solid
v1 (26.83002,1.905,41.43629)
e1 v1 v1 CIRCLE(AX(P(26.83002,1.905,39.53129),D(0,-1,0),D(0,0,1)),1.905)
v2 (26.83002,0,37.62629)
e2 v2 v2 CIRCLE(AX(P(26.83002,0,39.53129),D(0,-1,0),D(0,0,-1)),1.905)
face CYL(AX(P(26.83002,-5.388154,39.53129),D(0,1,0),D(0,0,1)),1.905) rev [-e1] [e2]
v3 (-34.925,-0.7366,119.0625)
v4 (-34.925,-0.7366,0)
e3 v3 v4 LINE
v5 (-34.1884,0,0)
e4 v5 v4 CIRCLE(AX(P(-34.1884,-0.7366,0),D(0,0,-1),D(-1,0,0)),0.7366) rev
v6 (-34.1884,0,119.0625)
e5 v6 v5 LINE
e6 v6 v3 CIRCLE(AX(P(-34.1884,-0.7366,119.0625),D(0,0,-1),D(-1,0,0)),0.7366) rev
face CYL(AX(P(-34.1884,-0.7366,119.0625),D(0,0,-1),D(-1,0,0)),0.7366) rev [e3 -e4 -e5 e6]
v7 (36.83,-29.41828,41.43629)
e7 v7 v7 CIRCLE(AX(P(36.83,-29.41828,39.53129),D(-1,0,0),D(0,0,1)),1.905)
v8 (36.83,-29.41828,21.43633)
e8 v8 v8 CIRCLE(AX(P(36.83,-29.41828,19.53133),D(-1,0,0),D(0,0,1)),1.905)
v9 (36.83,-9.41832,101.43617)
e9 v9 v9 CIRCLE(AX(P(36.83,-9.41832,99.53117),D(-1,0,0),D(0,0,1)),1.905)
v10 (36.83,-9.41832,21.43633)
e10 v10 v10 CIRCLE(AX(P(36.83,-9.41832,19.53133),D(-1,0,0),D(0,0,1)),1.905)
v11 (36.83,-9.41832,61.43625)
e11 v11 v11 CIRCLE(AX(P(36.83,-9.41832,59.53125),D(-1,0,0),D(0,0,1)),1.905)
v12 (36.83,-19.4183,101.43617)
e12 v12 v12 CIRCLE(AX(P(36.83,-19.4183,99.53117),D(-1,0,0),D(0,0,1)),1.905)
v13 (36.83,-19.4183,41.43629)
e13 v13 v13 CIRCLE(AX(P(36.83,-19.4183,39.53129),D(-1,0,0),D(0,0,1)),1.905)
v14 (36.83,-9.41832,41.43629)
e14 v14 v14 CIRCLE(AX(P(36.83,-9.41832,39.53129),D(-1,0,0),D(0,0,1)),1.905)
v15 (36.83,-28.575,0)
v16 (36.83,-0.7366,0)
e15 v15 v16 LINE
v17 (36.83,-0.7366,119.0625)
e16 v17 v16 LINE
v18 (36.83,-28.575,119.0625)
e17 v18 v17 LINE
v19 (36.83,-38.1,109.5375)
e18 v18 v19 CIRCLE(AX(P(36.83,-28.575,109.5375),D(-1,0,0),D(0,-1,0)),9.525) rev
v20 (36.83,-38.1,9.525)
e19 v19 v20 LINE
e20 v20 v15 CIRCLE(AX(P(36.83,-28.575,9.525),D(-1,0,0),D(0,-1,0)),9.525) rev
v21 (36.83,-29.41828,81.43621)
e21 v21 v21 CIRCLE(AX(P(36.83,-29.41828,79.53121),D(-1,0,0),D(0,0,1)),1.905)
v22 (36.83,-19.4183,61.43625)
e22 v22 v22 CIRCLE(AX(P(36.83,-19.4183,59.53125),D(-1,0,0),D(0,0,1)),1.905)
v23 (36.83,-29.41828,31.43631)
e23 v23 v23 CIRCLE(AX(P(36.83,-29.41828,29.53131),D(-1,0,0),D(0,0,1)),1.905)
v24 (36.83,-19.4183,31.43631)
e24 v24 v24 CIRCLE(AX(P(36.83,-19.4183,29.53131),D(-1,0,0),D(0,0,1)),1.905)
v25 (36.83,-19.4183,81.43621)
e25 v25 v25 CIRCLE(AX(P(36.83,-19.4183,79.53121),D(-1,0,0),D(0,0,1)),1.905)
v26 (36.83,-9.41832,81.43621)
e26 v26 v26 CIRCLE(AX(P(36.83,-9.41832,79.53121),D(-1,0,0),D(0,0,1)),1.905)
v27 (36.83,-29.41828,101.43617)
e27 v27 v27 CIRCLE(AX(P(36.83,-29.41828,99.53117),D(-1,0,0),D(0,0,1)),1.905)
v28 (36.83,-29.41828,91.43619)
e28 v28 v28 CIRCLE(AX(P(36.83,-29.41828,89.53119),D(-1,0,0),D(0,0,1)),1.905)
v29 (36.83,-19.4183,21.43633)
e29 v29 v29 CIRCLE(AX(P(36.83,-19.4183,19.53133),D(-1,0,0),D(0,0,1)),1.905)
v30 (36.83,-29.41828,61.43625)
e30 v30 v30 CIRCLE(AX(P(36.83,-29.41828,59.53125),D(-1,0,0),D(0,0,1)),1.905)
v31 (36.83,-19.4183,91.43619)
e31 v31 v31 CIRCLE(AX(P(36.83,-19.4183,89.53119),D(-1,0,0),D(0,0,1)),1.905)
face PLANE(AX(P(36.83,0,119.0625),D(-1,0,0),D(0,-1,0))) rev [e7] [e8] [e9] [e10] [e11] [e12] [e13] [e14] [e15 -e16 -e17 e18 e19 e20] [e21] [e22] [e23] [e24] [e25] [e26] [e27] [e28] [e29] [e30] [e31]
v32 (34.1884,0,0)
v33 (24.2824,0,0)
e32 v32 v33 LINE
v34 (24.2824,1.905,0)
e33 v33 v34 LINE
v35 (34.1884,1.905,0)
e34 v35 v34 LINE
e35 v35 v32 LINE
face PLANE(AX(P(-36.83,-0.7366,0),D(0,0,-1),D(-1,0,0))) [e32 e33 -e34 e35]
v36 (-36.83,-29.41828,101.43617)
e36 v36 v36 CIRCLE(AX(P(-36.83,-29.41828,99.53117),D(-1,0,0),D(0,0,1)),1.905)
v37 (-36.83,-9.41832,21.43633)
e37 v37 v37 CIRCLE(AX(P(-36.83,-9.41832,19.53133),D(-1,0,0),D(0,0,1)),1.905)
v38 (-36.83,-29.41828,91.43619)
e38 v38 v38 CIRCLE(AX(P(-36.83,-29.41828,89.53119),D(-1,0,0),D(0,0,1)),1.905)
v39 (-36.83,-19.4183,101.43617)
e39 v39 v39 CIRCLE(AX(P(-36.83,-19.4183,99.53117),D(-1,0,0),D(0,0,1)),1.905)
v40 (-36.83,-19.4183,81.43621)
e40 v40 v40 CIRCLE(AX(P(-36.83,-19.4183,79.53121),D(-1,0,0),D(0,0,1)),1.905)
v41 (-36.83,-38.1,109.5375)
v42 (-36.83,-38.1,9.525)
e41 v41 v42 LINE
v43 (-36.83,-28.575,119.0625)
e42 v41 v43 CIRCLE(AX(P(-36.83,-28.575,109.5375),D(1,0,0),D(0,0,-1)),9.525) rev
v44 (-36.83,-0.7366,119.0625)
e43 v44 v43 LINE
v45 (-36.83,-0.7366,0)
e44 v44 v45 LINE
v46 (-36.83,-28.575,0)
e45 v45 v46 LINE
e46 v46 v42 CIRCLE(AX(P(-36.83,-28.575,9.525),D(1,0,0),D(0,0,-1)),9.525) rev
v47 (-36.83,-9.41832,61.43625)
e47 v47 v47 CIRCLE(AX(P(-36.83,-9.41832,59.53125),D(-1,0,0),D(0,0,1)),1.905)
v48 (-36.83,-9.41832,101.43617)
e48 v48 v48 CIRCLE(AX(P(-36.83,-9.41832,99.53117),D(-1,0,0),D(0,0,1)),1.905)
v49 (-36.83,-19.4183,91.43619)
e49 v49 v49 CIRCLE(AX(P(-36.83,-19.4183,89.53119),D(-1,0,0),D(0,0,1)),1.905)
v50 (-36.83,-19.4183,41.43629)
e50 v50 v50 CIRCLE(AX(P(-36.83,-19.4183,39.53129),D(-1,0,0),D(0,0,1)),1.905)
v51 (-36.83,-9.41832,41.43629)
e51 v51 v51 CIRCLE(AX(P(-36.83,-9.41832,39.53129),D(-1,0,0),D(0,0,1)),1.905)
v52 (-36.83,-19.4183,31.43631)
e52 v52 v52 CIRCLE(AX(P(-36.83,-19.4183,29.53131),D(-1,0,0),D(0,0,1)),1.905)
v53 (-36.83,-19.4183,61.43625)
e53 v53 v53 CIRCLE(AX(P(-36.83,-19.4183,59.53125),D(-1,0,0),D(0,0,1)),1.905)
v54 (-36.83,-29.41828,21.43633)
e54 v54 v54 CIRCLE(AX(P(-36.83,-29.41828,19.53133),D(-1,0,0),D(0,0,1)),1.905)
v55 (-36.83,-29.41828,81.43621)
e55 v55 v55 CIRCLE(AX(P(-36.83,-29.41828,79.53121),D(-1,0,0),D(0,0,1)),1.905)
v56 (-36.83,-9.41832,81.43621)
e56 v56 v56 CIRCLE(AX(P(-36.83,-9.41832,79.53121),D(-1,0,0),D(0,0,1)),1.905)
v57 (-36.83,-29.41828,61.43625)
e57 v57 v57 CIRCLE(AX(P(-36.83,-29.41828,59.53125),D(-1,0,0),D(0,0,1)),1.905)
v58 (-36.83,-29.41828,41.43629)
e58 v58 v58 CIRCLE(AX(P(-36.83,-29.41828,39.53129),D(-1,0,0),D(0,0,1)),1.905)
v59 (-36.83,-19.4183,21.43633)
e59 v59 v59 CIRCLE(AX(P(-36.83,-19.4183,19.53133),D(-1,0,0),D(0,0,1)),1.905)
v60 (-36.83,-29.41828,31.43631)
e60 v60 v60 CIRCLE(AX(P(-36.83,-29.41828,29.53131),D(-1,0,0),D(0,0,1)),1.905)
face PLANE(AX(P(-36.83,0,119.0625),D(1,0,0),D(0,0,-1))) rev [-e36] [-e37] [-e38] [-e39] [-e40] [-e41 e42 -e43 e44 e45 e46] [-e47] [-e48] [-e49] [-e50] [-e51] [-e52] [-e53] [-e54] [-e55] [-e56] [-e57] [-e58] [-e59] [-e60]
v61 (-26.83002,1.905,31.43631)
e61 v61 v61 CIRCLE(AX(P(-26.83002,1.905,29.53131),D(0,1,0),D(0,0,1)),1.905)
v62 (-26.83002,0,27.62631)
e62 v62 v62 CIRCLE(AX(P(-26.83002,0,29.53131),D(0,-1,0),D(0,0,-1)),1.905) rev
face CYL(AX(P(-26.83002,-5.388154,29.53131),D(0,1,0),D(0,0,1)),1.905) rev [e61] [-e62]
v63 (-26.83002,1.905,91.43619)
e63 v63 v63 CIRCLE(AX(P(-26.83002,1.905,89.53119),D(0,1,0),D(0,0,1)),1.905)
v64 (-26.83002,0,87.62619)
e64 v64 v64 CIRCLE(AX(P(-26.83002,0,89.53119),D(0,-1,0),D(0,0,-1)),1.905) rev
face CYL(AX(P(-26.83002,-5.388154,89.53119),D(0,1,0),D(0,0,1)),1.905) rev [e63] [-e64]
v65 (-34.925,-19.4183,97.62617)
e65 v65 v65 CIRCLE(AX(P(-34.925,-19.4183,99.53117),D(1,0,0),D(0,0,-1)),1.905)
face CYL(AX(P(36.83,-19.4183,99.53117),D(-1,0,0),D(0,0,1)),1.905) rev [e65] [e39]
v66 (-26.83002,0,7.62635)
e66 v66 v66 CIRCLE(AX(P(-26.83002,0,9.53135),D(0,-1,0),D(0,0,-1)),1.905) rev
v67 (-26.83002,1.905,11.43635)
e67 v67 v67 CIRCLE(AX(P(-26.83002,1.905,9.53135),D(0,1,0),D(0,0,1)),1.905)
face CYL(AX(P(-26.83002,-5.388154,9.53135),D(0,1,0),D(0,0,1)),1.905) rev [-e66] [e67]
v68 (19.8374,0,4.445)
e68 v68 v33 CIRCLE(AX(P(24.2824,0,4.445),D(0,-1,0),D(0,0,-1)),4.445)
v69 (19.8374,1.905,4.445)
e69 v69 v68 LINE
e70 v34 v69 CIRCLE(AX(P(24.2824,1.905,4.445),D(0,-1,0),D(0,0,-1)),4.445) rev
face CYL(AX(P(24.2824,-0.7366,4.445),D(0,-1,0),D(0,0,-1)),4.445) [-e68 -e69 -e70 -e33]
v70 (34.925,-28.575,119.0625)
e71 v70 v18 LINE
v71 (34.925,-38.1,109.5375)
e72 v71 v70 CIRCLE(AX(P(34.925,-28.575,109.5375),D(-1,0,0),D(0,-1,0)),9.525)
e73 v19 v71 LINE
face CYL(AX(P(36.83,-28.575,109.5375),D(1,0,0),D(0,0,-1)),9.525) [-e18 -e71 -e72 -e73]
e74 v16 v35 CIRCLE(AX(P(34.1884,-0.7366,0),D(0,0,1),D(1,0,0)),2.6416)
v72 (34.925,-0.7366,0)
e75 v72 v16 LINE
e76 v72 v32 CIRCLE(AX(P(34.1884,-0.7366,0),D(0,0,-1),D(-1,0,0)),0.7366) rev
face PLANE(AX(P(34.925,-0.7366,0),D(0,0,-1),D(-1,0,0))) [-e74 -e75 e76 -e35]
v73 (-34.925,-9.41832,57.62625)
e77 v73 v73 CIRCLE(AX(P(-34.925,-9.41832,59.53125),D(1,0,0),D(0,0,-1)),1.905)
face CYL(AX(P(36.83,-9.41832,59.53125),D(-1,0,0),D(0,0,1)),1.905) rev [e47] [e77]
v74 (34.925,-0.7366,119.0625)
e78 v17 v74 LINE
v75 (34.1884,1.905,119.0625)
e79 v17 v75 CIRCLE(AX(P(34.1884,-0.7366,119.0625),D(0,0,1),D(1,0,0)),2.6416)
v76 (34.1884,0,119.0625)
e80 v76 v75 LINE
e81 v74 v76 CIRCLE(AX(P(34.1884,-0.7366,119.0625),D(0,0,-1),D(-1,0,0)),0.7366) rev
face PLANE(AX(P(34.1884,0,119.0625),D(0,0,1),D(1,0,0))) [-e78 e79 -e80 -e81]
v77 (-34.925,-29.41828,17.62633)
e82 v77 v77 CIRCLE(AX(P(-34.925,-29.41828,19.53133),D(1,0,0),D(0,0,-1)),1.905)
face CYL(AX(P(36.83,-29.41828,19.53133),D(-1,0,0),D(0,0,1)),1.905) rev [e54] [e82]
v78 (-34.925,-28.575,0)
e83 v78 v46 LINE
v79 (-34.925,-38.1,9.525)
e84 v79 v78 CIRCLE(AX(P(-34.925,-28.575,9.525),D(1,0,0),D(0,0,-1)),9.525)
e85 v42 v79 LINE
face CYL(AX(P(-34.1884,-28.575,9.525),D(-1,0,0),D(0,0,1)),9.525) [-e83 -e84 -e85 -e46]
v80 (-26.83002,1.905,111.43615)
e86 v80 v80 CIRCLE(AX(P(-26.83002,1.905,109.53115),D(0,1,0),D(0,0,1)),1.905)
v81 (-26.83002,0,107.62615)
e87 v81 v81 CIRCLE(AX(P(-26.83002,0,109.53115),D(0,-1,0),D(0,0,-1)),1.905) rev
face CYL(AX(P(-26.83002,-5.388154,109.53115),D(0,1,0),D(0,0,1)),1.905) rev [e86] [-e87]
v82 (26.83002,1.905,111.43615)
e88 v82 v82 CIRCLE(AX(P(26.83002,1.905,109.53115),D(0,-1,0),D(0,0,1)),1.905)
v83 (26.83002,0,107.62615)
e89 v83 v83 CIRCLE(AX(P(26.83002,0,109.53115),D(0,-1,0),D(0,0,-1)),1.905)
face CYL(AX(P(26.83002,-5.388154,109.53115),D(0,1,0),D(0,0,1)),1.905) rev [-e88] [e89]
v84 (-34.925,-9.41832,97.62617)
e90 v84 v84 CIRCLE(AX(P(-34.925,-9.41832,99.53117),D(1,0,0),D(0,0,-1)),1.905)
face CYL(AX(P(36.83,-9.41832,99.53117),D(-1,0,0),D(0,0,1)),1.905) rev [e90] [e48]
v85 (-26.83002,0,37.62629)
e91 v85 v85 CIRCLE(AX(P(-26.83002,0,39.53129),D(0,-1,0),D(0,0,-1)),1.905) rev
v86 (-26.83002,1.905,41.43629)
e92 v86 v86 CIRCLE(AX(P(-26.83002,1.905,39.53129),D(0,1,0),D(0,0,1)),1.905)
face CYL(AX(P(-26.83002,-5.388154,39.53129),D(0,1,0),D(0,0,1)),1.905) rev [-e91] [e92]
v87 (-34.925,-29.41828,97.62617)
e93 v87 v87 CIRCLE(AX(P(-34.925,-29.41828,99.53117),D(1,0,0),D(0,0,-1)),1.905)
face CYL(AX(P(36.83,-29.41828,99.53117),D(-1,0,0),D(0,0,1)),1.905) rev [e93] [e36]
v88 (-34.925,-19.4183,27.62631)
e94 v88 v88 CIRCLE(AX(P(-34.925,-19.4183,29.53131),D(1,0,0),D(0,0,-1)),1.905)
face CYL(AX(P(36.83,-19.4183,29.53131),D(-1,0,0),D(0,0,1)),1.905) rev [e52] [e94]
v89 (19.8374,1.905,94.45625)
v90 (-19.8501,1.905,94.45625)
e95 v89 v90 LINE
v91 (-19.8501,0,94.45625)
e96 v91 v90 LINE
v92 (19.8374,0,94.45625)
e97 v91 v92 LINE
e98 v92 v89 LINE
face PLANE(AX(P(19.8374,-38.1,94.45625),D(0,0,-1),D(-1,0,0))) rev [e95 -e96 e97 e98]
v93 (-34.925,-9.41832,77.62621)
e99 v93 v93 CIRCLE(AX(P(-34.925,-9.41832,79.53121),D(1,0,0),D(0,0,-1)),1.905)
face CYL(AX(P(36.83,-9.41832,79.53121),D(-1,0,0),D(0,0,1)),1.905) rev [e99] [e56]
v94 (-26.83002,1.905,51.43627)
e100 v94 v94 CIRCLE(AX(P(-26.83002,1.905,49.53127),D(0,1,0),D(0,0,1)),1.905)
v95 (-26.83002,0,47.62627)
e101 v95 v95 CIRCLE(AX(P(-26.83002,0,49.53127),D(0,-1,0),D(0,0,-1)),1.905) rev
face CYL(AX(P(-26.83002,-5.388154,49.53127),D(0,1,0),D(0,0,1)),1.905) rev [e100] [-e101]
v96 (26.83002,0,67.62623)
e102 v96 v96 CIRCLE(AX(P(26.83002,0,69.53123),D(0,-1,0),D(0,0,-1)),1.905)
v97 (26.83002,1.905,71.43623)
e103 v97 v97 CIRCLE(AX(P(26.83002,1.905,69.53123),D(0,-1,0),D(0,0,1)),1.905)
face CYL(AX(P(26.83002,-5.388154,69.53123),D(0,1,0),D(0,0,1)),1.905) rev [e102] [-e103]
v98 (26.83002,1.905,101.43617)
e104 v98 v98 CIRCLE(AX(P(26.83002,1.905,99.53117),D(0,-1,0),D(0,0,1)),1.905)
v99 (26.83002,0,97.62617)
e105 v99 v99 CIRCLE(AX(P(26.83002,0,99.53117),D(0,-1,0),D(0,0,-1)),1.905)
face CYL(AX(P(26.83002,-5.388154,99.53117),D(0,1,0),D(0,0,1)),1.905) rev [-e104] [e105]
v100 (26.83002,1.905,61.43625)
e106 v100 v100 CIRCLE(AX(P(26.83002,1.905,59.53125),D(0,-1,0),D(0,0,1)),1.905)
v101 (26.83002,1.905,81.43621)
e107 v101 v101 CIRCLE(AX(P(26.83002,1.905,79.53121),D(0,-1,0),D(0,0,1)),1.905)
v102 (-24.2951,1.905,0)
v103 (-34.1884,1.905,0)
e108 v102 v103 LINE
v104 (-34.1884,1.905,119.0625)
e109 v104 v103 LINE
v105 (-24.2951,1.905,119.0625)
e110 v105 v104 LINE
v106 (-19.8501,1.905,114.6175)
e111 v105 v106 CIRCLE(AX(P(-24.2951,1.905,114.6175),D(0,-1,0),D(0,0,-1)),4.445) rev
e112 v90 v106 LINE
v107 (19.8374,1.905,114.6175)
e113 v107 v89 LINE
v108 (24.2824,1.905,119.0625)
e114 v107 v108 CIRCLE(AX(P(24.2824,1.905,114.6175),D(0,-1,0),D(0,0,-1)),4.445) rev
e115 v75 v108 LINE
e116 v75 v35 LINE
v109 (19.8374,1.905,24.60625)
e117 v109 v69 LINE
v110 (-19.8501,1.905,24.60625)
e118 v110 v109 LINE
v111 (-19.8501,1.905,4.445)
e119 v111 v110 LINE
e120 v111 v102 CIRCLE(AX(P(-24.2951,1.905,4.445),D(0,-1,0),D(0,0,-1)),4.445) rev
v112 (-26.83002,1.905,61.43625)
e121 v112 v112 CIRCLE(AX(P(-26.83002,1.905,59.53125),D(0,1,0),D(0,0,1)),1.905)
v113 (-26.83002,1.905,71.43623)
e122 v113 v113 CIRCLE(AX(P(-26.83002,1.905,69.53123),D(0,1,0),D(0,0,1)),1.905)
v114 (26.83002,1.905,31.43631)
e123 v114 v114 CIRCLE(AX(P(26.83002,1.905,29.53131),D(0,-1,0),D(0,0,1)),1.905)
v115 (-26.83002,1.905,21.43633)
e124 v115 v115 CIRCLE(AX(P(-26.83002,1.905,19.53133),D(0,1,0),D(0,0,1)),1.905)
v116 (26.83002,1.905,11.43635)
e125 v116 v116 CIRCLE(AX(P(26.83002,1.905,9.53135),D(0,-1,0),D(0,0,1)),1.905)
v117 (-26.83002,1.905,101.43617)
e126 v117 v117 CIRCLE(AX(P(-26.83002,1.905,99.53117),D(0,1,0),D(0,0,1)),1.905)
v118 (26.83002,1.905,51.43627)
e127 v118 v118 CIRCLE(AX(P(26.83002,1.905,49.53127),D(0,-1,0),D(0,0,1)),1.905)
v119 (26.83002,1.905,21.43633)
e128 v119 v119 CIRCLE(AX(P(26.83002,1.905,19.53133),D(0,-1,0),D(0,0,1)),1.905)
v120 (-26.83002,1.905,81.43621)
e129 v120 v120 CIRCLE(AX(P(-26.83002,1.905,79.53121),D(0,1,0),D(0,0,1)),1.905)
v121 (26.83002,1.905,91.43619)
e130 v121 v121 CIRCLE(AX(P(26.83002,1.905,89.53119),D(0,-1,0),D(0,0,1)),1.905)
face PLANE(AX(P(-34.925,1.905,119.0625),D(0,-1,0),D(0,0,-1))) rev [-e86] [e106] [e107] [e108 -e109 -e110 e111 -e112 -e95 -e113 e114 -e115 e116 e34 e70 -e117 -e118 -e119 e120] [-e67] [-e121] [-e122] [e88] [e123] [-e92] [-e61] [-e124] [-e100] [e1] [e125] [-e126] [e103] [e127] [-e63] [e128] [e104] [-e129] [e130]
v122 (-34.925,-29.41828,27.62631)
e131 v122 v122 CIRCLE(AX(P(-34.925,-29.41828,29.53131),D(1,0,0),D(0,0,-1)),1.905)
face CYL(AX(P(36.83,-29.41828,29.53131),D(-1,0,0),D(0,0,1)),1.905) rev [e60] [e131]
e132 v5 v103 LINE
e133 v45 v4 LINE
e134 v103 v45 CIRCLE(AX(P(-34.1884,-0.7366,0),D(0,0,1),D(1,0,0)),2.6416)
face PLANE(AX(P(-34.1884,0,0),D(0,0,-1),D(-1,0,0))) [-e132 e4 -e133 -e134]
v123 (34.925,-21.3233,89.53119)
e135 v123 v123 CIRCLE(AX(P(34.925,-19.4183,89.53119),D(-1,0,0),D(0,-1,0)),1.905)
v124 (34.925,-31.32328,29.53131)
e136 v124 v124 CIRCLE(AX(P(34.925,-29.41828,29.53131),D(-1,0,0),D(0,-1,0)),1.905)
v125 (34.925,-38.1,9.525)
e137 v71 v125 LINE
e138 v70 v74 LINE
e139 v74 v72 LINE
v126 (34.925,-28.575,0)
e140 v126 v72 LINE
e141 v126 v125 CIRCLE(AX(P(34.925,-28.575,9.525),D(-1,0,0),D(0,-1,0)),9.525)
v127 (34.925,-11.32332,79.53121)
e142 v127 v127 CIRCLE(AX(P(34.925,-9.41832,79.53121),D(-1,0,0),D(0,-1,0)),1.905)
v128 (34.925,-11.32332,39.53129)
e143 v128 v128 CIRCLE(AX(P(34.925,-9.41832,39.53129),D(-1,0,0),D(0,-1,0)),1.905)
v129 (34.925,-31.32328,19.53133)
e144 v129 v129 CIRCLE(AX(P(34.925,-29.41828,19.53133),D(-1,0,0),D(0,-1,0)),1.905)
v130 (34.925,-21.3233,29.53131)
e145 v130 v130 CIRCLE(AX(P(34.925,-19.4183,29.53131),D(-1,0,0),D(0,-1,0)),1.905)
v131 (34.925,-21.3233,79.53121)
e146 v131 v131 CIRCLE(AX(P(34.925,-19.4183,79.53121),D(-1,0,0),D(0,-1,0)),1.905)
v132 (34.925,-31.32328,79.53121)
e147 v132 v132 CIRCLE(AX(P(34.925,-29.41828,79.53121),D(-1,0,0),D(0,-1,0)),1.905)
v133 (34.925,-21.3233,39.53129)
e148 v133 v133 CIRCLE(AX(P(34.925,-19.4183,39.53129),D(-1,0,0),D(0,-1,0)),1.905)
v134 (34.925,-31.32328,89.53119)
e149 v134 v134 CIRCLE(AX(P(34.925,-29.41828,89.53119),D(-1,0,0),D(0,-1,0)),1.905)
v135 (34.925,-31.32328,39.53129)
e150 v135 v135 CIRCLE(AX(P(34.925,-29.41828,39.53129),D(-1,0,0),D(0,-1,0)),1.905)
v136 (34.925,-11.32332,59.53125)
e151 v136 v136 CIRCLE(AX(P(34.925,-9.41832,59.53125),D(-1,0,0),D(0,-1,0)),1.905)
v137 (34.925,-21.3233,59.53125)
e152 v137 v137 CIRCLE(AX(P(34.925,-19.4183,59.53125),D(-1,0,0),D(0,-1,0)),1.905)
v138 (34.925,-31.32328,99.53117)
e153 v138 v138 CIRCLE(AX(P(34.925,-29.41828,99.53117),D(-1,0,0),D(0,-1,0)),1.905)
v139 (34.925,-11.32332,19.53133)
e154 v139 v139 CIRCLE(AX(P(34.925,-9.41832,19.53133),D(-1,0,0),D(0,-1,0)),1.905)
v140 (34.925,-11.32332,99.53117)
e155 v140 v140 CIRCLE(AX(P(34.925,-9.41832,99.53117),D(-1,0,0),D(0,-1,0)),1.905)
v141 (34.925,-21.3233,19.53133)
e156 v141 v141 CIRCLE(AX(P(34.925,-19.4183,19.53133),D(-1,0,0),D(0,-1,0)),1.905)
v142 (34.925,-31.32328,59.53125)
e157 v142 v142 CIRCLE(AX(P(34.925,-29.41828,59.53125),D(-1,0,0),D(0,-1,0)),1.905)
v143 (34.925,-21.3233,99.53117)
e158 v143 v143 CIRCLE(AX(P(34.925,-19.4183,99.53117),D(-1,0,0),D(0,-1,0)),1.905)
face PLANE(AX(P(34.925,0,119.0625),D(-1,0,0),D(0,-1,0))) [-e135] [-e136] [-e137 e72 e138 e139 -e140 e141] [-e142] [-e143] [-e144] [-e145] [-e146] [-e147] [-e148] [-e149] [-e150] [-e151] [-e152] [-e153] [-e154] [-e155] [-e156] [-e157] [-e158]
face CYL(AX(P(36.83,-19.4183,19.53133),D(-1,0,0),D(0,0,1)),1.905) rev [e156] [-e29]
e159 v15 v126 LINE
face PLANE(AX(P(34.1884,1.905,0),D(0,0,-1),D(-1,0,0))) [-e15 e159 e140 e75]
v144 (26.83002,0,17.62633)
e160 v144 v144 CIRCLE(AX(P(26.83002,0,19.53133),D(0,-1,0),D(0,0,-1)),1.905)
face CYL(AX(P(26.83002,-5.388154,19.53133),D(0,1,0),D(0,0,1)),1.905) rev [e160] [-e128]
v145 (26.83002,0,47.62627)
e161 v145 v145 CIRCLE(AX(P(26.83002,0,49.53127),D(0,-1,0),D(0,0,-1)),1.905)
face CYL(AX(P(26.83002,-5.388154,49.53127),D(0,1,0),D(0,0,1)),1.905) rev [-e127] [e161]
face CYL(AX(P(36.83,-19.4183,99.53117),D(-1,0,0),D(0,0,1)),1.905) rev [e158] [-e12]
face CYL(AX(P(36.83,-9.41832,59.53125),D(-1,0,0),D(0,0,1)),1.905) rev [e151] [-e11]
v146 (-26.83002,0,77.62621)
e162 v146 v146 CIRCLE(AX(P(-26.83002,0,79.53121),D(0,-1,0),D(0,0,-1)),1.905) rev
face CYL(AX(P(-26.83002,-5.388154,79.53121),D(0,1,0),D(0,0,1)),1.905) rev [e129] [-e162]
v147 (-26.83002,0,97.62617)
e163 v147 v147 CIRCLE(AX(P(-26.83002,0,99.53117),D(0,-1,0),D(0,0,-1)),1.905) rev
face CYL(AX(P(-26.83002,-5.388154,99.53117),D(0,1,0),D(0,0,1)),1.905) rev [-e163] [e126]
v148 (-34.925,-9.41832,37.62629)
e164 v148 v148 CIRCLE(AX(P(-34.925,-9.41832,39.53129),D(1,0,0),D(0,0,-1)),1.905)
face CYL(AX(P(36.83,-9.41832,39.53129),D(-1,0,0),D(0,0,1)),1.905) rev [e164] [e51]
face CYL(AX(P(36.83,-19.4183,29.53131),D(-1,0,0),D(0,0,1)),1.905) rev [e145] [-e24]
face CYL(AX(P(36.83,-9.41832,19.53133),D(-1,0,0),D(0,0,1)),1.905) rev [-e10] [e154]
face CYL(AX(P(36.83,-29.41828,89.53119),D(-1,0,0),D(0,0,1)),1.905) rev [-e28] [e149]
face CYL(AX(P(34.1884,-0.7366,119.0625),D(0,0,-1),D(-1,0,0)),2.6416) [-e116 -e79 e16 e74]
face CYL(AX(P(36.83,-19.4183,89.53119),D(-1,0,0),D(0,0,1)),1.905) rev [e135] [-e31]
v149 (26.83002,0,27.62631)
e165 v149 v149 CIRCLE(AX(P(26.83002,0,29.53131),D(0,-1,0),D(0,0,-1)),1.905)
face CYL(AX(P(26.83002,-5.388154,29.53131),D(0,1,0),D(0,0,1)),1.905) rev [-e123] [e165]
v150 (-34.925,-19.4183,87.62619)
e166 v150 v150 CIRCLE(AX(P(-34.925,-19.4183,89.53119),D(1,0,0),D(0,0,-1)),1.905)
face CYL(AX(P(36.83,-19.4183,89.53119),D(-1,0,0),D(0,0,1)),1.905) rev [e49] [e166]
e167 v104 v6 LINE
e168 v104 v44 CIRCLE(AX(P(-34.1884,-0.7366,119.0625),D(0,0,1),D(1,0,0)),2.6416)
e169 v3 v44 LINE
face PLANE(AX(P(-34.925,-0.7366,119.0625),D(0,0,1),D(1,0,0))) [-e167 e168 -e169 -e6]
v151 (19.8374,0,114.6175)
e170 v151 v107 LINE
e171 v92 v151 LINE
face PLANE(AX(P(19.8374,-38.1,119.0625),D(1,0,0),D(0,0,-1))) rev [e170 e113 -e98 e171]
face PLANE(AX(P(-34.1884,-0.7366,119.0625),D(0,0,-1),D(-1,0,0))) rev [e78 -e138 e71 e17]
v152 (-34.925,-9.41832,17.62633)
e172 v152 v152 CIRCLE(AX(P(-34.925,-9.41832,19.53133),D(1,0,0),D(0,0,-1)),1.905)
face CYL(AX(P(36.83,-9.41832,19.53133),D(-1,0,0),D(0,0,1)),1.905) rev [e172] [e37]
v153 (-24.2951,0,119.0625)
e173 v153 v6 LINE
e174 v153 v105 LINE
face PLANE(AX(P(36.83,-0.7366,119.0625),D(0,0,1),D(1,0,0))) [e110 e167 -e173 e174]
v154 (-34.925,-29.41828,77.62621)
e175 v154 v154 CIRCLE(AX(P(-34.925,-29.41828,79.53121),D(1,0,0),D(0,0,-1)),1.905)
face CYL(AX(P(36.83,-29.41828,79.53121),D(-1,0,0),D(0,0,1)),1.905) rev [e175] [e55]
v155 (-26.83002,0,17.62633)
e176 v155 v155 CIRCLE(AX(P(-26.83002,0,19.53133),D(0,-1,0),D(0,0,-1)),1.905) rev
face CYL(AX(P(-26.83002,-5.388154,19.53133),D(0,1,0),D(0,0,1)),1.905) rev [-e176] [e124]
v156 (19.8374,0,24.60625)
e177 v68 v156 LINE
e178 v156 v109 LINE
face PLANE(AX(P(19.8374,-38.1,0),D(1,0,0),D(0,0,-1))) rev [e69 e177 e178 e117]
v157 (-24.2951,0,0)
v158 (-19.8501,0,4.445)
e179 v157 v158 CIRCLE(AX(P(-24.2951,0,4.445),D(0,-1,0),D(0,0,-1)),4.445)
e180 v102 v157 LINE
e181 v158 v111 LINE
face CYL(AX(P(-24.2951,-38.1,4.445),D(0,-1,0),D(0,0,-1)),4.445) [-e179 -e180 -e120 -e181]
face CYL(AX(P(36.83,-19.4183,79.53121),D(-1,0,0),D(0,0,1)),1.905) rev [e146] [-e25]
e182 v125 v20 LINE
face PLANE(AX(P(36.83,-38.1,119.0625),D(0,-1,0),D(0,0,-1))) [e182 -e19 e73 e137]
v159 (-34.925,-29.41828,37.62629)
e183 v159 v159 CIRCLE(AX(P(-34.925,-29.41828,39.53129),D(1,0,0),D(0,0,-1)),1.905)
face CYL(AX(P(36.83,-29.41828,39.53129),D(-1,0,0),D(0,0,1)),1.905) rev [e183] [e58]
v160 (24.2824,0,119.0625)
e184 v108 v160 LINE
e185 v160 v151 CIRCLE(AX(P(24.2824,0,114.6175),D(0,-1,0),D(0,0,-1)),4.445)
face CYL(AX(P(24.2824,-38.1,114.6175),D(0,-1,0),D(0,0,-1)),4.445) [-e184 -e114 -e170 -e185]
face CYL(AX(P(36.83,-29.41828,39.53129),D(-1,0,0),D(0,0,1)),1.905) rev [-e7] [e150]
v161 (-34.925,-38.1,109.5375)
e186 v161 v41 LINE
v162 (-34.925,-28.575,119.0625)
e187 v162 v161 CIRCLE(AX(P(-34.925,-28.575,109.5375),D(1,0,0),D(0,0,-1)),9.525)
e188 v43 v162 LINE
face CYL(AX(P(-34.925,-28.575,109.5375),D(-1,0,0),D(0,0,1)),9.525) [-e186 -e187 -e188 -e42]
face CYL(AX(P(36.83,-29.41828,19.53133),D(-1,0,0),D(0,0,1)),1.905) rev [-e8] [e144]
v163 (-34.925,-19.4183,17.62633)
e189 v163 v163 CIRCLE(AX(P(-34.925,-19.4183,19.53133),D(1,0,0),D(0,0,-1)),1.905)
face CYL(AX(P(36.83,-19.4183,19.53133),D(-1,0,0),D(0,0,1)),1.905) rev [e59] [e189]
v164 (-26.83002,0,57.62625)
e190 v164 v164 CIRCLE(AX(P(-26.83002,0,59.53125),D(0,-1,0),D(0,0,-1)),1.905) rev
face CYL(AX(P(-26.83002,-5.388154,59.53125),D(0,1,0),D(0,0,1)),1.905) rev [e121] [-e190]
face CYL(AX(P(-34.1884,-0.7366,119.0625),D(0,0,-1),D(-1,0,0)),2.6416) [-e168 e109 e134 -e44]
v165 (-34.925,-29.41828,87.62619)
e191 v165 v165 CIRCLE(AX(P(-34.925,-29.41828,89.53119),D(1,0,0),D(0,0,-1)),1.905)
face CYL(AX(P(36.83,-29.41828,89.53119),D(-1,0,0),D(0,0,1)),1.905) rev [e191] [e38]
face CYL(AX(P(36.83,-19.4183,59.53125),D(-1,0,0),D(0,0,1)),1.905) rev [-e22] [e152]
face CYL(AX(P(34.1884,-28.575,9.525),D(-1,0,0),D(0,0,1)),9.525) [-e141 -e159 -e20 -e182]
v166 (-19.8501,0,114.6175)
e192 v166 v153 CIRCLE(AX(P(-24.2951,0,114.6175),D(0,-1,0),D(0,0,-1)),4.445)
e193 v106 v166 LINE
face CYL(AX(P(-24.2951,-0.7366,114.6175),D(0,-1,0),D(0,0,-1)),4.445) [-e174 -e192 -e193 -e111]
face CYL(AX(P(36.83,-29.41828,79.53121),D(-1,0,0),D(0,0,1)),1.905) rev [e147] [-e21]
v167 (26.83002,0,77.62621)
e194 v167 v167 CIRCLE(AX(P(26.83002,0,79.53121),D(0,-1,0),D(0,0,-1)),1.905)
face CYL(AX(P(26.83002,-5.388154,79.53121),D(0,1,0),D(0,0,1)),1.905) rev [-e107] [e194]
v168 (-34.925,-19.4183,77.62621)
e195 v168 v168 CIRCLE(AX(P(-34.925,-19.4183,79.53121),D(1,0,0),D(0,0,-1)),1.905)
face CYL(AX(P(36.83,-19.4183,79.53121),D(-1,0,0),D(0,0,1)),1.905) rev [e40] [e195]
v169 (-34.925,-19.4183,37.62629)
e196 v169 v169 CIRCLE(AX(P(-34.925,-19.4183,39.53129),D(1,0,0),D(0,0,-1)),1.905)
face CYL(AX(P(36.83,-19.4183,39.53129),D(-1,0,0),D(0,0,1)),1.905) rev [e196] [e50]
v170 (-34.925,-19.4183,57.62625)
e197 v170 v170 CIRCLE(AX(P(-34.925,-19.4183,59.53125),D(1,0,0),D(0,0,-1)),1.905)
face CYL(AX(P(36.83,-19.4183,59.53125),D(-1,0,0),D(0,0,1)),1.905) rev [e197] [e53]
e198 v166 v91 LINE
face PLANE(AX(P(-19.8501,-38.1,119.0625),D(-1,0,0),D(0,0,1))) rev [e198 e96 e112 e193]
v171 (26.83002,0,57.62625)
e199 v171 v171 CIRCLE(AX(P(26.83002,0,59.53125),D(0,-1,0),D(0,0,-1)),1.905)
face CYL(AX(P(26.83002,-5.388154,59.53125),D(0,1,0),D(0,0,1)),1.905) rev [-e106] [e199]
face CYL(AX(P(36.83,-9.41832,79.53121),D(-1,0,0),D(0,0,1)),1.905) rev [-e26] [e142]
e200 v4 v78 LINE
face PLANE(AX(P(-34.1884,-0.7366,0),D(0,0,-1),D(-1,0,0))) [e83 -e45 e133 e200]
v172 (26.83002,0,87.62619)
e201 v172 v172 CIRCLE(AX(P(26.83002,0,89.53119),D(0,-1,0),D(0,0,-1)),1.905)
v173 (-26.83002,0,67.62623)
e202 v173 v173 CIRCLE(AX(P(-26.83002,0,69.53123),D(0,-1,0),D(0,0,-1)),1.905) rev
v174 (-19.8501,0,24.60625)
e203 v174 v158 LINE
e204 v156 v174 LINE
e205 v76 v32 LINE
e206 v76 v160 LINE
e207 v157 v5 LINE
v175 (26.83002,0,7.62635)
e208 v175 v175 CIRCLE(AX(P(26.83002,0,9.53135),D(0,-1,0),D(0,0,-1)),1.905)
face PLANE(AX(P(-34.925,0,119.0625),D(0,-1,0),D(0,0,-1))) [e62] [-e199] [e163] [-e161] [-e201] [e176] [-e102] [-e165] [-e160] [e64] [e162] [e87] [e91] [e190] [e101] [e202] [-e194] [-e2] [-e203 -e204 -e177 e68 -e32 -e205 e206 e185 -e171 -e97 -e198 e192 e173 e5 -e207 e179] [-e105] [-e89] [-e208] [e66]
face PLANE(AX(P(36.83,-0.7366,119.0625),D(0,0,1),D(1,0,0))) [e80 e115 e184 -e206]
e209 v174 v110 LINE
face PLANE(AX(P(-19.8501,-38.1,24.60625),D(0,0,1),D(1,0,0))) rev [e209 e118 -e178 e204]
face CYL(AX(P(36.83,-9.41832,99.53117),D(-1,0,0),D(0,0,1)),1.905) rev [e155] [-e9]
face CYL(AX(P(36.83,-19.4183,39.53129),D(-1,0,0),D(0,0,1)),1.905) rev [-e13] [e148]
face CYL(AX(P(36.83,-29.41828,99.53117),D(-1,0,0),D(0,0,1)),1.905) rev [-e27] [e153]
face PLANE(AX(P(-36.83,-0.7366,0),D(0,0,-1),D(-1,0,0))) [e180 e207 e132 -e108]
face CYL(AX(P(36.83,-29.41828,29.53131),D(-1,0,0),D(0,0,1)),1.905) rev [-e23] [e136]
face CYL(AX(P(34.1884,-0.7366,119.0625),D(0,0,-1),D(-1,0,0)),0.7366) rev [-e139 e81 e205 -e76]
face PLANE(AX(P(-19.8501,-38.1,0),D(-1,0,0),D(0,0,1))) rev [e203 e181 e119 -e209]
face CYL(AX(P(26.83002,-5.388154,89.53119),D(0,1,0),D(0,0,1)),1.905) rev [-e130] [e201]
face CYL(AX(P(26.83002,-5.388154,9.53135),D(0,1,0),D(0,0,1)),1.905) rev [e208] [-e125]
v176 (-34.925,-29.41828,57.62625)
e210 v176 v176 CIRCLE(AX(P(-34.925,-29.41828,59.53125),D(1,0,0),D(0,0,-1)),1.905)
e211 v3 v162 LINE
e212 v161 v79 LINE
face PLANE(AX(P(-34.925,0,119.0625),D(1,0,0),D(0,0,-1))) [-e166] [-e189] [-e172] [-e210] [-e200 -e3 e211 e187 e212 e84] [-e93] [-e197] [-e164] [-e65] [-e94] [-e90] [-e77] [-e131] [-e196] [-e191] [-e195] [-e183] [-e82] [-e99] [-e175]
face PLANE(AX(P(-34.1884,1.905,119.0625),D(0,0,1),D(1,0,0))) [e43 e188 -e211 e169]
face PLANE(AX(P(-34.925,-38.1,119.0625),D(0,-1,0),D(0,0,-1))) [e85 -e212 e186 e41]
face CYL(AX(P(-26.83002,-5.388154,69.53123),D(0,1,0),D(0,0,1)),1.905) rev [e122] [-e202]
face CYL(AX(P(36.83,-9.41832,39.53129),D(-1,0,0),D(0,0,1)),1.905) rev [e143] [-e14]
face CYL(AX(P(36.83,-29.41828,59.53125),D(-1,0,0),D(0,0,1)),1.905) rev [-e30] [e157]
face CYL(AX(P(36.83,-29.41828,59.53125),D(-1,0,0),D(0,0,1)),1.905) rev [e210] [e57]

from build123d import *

# Parameters (mm, degrees)
BASE_FLANGE1_DEPTH            = 119.0625
SKETCH6_W                     = 39.6875
SKETCH6_H                     = 24.60625
CUT_EXTRUDE1_DEPTH            = 131.892046478
FILLET1_R                     = 4.445
FILLET2_R                     = 9.525
SKETCH7_R                     = 1.905
CUT_EXTRUDE2_DEPTH            = 146.0975
LPATTERN1_COUNT               = 2
LPATTERN1_PITCH               = 9.99998
LPATTERN2_COUNT               = 2
LPATTERN2_PITCH               = 9.99998
LPATTERN3_COUNT               = 3
LPATTERN3_PITCH               = 19.99996
LPATTERN3_COPY_1_SKETCH_R     = 1.905
LPATTERN3_COPY_1_DEPTH        = 146.0975
LPATTERN3_COPY_2_SKETCH_R     = 1.905
LPATTERN3_COPY_2_DEPTH        = 146.0975
LPATTERN4_COUNT               = 3
LPATTERN4_PITCH               = 19.99996
LPATTERN4_COPY_1_SKETCH_R     = 1.905
LPATTERN4_COPY_1_DEPTH        = 146.0975
LPATTERN4_COPY_2_SKETCH_R     = 1.905
LPATTERN4_COPY_2_DEPTH        = 146.0975
LPATTERN5_COPY_1_SKETCH_R     = 1.905
LPATTERN5_COPY_1_DEPTH        = 146.0975
LPATTERN5_COPY_2_SKETCH_R     = 1.905
LPATTERN5_COPY_2_DEPTH        = 146.0975
LPATTERN5_COPY_3_SKETCH_R     = 1.905
LPATTERN5_COPY_3_DEPTH        = 146.0975
LPATTERN5_COPY_4_SKETCH_R     = 1.905
LPATTERN5_COPY_4_DEPTH        = 146.0975
LPATTERN6_COPY_1_SKETCH_R     = 1.905
LPATTERN6_COPY_1_DEPTH        = 146.0975
LPATTERN6_COPY_2_SKETCH_R     = 1.905
LPATTERN6_COPY_2_DEPTH        = 146.0975
LPATTERN6_COPY_3_SKETCH_R     = 1.905
LPATTERN6_COPY_3_DEPTH        = 146.0975
LPATTERN6_COPY_4_SKETCH_R     = 1.905
LPATTERN6_COPY_4_DEPTH        = 146.0975
SKETCH8_R                     = 1.905
CUT_EXTRUDE3_DEPTH            = 1.905
LPATTERN7_COUNT               = 6
LPATTERN7_PITCH               = 9.99998
LPATTERN7_COL_COUNT           = 6
LPATTERN7_COL_PITCH           = 9.99998
MIRROR1_COPY_1_SKETCH_R       = 1.905
MIRROR1_COPY_1_DEPTH          = 1.905
MIRROR1_COPY_2_SKETCH_R       = 1.905
MIRROR1_COPY_2_DEPTH          = 1.905
MIRROR1_COPY_3_SKETCH_R       = 1.905
MIRROR1_COPY_3_DEPTH          = 1.905
MIRROR1_COPY_4_SKETCH_R       = 1.905
MIRROR1_COPY_4_DEPTH          = 1.905
MIRROR1_COPY_5_SKETCH_R       = 1.905
MIRROR1_COPY_5_DEPTH          = 1.905
MIRROR1_COPY_6_SKETCH_R       = 1.905
MIRROR1_COPY_6_DEPTH          = 1.905
MIRROR1_COPY_7_SKETCH_R       = 1.905
MIRROR1_COPY_7_DEPTH          = 1.905
MIRROR1_COPY_8_SKETCH_R       = 1.905
MIRROR1_COPY_8_DEPTH          = 1.905
MIRROR1_COPY_9_SKETCH_R       = 1.905
MIRROR1_COPY_9_DEPTH          = 1.905
MIRROR1_COPY_10_SKETCH_R      = 1.905
MIRROR1_COPY_10_DEPTH         = 1.905
LPATTERN8_COUNT               = 2
LPATTERN8_PITCH               = 29.99994
LPATTERN8_COPY_1_SKETCH_R     = 1.905
LPATTERN8_COPY_1_DEPTH        = 146.0975
LPATTERN8_COL_COUNT           = 2
LPATTERN8_COL_PITCH           = 29.99994
LPATTERN8_COL_COPY_1_SKETCH_R = 1.905
LPATTERN8_COL_COPY_1_DEPTH    = 146.0975


# Sheet-metal steps are written as plain solids
with BuildPart() as part:
    # Sketch1 → Base-Flange1 (new body)
    with BuildSketch(Plane.XY):
        with BuildLine():
            Line((-34.925, -38.1), (-34.925, -0.7366))
            ThreePointArc((-34.925, -0.7366), (-34.709254855, -0.215745145), (-34.1884, 0))
            Line((-34.1884, 0), (34.1884, 0))
            ThreePointArc((34.1884, 0), (34.709254855, -0.215745145), (34.925, -0.7366))
            Line((34.925, -0.7366), (34.925, -38.1))
            Line((34.925, -38.1), (36.83, -38.1))
            Line((36.83, -38.1), (36.83, -0.7366))
            ThreePointArc((36.83, -0.7366), (36.056293273, 1.131293273), (34.1884, 1.905))
            Line((34.1884, 1.905), (-34.1884, 1.905))
            ThreePointArc((-34.1884, 1.905), (-36.056293273, 1.131293273), (-36.83, -0.7366))
            Line((-36.83, -0.7366), (-36.83, -38.1))
            Line((-36.83, -38.1), (-34.925, -38.1))
        make_face()
    extrude(amount=BASE_FLANGE1_DEPTH)

    # Sketch6 → Cut-Extrude1 (cut, through all)
    with BuildSketch(Plane(origin=(0, 1.905, 0), x_dir=(1, 0, 0), z_dir=(0, 1, 0))):
        with Locations((-0.00635, -12.303125)):
            Rectangle(SKETCH6_W, SKETCH6_H)
        with Locations((-0.00635, -106.759375)):
            Rectangle(SKETCH6_W, SKETCH6_H)
    extrude(amount=-CUT_EXTRUDE1_DEPTH, mode=Mode.SUBTRACT)

    # Fillet1
    fillet1_edges = [part.edges().sort_by_distance(p)[0] for p in [
        (-19.8501, 0.9525, 0),
        (19.8374, 0.9525, 0),
        (19.8374, 0.9525, 119.0625),
        (-19.8501, 0.9525, 119.0625),
    ]]
    fillet(fillet1_edges, radius=FILLET1_R)

    # Fillet2
    fillet2_edges = [part.edges().sort_by_distance(p)[0] for p in [
        (35.8775, -38.1, 0),
        (-35.8775, -38.1, 0),
        (35.8775, -38.1, 119.0625),
        (-35.8775, -38.1, 119.0625),
    ]]
    fillet(fillet2_edges, radius=FILLET2_R)

    # Sketch7 → Cut-Extrude2 (cut, through all)
    with BuildSketch(Plane.ZY.offset(36.83)):
        with Locations((59.53125, -19.4183)):
            Circle(SKETCH7_R)
    cut_extrude2 = extrude(amount=-CUT_EXTRUDE2_DEPTH, mode=Mode.SUBTRACT)

    # LPattern1: Cut-Extrude2 ×2
    with Locations(*[(0, i * LPATTERN1_PITCH, 0) for i in range(1, LPATTERN1_COUNT)]):
        add(cut_extrude2, mode=Mode.SUBTRACT)

    # LPattern2: Cut-Extrude2 ×2
    with Locations(*[(0, -i * LPATTERN2_PITCH, 0) for i in range(1, LPATTERN2_COUNT)]):
        add(cut_extrude2, mode=Mode.SUBTRACT)

    # LPattern3: Cut-Extrude2 ×3
    with Locations(*[(0, 0, i * LPATTERN3_PITCH) for i in range(1, LPATTERN3_COUNT)]):
        add(cut_extrude2, mode=Mode.SUBTRACT)

    # LPattern3 copy 1 sketch → LPattern3 copy 1 (cut, through all)
    with BuildSketch(Plane(origin=(-36.83, -9.99998, 19.99996), x_dir=(0, 0, 1), z_dir=(-1, 0, 0))):
        with Locations((59.53125, -19.4183)):
            Circle(LPATTERN3_COPY_1_SKETCH_R)
    extrude(amount=-LPATTERN3_COPY_1_DEPTH, mode=Mode.SUBTRACT)

    # LPattern3 copy 2 sketch → LPattern3 copy 2 (cut, through all)
    with BuildSketch(Plane(origin=(-36.83, -9.99998, 39.99992), x_dir=(0, 0, 1), z_dir=(-1, 0, 0))):
        with Locations((59.53125, -19.4183)):
            Circle(LPATTERN3_COPY_2_SKETCH_R)
    extrude(amount=-LPATTERN3_COPY_2_DEPTH, mode=Mode.SUBTRACT)

    # LPattern4: Cut-Extrude2 ×3
    with Locations(*[(0, 0, -i * LPATTERN4_PITCH) for i in range(1, LPATTERN4_COUNT)]):
        add(cut_extrude2, mode=Mode.SUBTRACT)

    # LPattern4 copy 1 sketch → LPattern4 copy 1 (cut, through all)
    with BuildSketch(Plane(origin=(-36.83, -9.99998, -19.99996), x_dir=(0, 0, 1), z_dir=(-1, 0, 0))):
        with Locations((59.53125, -19.4183)):
            Circle(LPATTERN4_COPY_1_SKETCH_R)
    extrude(amount=-LPATTERN4_COPY_1_DEPTH, mode=Mode.SUBTRACT)

    # LPattern4 copy 2 sketch → LPattern4 copy 2 (cut, through all)
    with BuildSketch(Plane(origin=(-36.83, -9.99998, -39.99992), x_dir=(0, 0, 1), z_dir=(-1, 0, 0))):
        with Locations((59.53125, -19.4183)):
            Circle(LPATTERN4_COPY_2_SKETCH_R)
    extrude(amount=-LPATTERN4_COPY_2_DEPTH, mode=Mode.SUBTRACT)

    # LPattern5 copy 1 sketch → LPattern5 copy 1 (cut, through all)
    with BuildSketch(Plane(origin=(-36.83, 9.99998, -19.99996), x_dir=(0, 0, 1), z_dir=(-1, 0, 0))):
        with Locations((59.53125, -19.4183)):
            Circle(LPATTERN5_COPY_1_SKETCH_R)
    extrude(amount=-LPATTERN5_COPY_1_DEPTH, mode=Mode.SUBTRACT)

    # LPattern5 copy 2 sketch → LPattern5 copy 2 (cut, through all)
    with BuildSketch(Plane(origin=(-36.83, 9.99998, -39.99992), x_dir=(0, 0, 1), z_dir=(-1, 0, 0))):
        with Locations((59.53125, -19.4183)):
            Circle(LPATTERN5_COPY_2_SKETCH_R)
    extrude(amount=-LPATTERN5_COPY_2_DEPTH, mode=Mode.SUBTRACT)

    # LPattern5 copy 3 sketch → LPattern5 copy 3 (cut, through all)
    with BuildSketch(Plane(origin=(-36.83, 0, -19.99996), x_dir=(0, 0, 1), z_dir=(-1, 0, 0))):
        with Locations((59.53125, -19.4183)):
            Circle(LPATTERN5_COPY_3_SKETCH_R)
    extrude(amount=-LPATTERN5_COPY_3_DEPTH, mode=Mode.SUBTRACT)

    # LPattern5 copy 4 sketch → LPattern5 copy 4 (cut, through all)
    with BuildSketch(Plane(origin=(-36.83, 0, -39.99992), x_dir=(0, 0, 1), z_dir=(-1, 0, 0))):
        with Locations((59.53125, -19.4183)):
            Circle(LPATTERN5_COPY_4_SKETCH_R)
    extrude(amount=-LPATTERN5_COPY_4_DEPTH, mode=Mode.SUBTRACT)

    # LPattern6 copy 1 sketch → LPattern6 copy 1 (cut, through all)
    with BuildSketch(Plane(origin=(-36.83, 9.99998, 19.99996), x_dir=(0, 0, 1), z_dir=(-1, 0, 0))):
        with Locations((59.53125, -19.4183)):
            Circle(LPATTERN6_COPY_1_SKETCH_R)
    extrude(amount=-LPATTERN6_COPY_1_DEPTH, mode=Mode.SUBTRACT)

    # LPattern6 copy 2 sketch → LPattern6 copy 2 (cut, through all)
    with BuildSketch(Plane(origin=(-36.83, 9.99998, 39.99992), x_dir=(0, 0, 1), z_dir=(-1, 0, 0))):
        with Locations((59.53125, -19.4183)):
            Circle(LPATTERN6_COPY_2_SKETCH_R)
    extrude(amount=-LPATTERN6_COPY_2_DEPTH, mode=Mode.SUBTRACT)

    # LPattern6 copy 3 sketch → LPattern6 copy 3 (cut, through all)
    with BuildSketch(Plane(origin=(-36.83, 0, 19.99996), x_dir=(0, 0, 1), z_dir=(-1, 0, 0))):
        with Locations((59.53125, -19.4183)):
            Circle(LPATTERN6_COPY_3_SKETCH_R)
    extrude(amount=-LPATTERN6_COPY_3_DEPTH, mode=Mode.SUBTRACT)

    # LPattern6 copy 4 sketch → LPattern6 copy 4 (cut, through all)
    with BuildSketch(Plane(origin=(-36.83, 0, 39.99992), x_dir=(0, 0, 1), z_dir=(-1, 0, 0))):
        with Locations((59.53125, -19.4183)):
            Circle(LPATTERN6_COPY_4_SKETCH_R)
    extrude(amount=-LPATTERN6_COPY_4_DEPTH, mode=Mode.SUBTRACT)

    # Sketch8 → Cut-Extrude3 (cut)
    with BuildSketch(Plane(origin=(0, 1.905, 0), x_dir=(1, 0, 0), z_dir=(0, 1, 0))):
        with Locations(Location((-26.83002, -59.53125, 0), (0, 0, 270))):
            Circle(SKETCH8_R)
    cut_extrude3 = extrude(amount=-CUT_EXTRUDE3_DEPTH, mode=Mode.SUBTRACT)

    # LPattern7: Cut-Extrude3 ×6
    with Locations(*[(0, 0, i * LPATTERN7_PITCH) for i in range(1, LPATTERN7_COUNT)]):
        add(cut_extrude3, mode=Mode.SUBTRACT)

    # LPattern7 col: Cut-Extrude3 ×6
    with Locations(*[(0, 0, -i * LPATTERN7_COL_PITCH) for i in range(1, LPATTERN7_COL_COUNT)]):
        add(cut_extrude3, mode=Mode.SUBTRACT)

    # Mirror1: Cut-Extrude3 across plane
    add(cut_extrude3.mirror(Plane(origin=(0, 0, 0), x_dir=(0, 0, 1), z_dir=(1, 0, 0))), mode=Mode.SUBTRACT)

    # Mirror1 copy 1 sketch → Mirror1 copy 1 (cut)
    with BuildSketch(Plane(origin=(0, 1.905, 9.99998), x_dir=(-1, 0, 0), z_dir=(0, 1, 0))):
        with Locations((-26.83002, 59.53125)):
            Circle(MIRROR1_COPY_1_SKETCH_R)
    extrude(amount=-MIRROR1_COPY_1_DEPTH, mode=Mode.SUBTRACT)

    # Mirror1 copy 2 sketch → Mirror1 copy 2 (cut)
    with BuildSketch(Plane(origin=(0, 1.905, 19.99996), x_dir=(-1, 0, 0), z_dir=(0, 1, 0))):
        with Locations((-26.83002, 59.53125)):
            Circle(MIRROR1_COPY_2_SKETCH_R)
    extrude(amount=-MIRROR1_COPY_2_DEPTH, mode=Mode.SUBTRACT)

    # Mirror1 copy 3 sketch → Mirror1 copy 3 (cut)
    with BuildSketch(Plane(origin=(0, 1.905, 29.99994), x_dir=(-1, 0, 0), z_dir=(0, 1, 0))):
        with Locations((-26.83002, 59.53125)):
            Circle(MIRROR1_COPY_3_SKETCH_R)
    extrude(amount=-MIRROR1_COPY_3_DEPTH, mode=Mode.SUBTRACT)

    # Mirror1 copy 4 sketch → Mirror1 copy 4 (cut)
    with BuildSketch(Plane(origin=(0, 1.905, 39.99992), x_dir=(-1, 0, 0), z_dir=(0, 1, 0))):
        with Locations((-26.83002, 59.53125)):
            Circle(MIRROR1_COPY_4_SKETCH_R)
    extrude(amount=-MIRROR1_COPY_4_DEPTH, mode=Mode.SUBTRACT)

    # Mirror1 copy 5 sketch → Mirror1 copy 5 (cut)
    with BuildSketch(Plane(origin=(0, 1.905, 49.9999), x_dir=(-1, 0, 0), z_dir=(0, 1, 0))):
        with Locations((-26.83002, 59.53125)):
            Circle(MIRROR1_COPY_5_SKETCH_R)
    extrude(amount=-MIRROR1_COPY_5_DEPTH, mode=Mode.SUBTRACT)

    # Mirror1 copy 6 sketch → Mirror1 copy 6 (cut)
    with BuildSketch(Plane(origin=(0, 1.905, -9.99998), x_dir=(-1, 0, 0), z_dir=(0, 1, 0))):
        with Locations((-26.83002, 59.53125)):
            Circle(MIRROR1_COPY_6_SKETCH_R)
    extrude(amount=-MIRROR1_COPY_6_DEPTH, mode=Mode.SUBTRACT)

    # Mirror1 copy 7 sketch → Mirror1 copy 7 (cut)
    with BuildSketch(Plane(origin=(0, 1.905, -19.99996), x_dir=(-1, 0, 0), z_dir=(0, 1, 0))):
        with Locations((-26.83002, 59.53125)):
            Circle(MIRROR1_COPY_7_SKETCH_R)
    extrude(amount=-MIRROR1_COPY_7_DEPTH, mode=Mode.SUBTRACT)

    # Mirror1 copy 8 sketch → Mirror1 copy 8 (cut)
    with BuildSketch(Plane(origin=(0, 1.905, -29.99994), x_dir=(-1, 0, 0), z_dir=(0, 1, 0))):
        with Locations((-26.83002, 59.53125)):
            Circle(MIRROR1_COPY_8_SKETCH_R)
    extrude(amount=-MIRROR1_COPY_8_DEPTH, mode=Mode.SUBTRACT)

    # Mirror1 copy 9 sketch → Mirror1 copy 9 (cut)
    with BuildSketch(Plane(origin=(0, 1.905, -39.99992), x_dir=(-1, 0, 0), z_dir=(0, 1, 0))):
        with Locations((-26.83002, 59.53125)):
            Circle(MIRROR1_COPY_9_SKETCH_R)
    extrude(amount=-MIRROR1_COPY_9_DEPTH, mode=Mode.SUBTRACT)

    # Mirror1 copy 10 sketch → Mirror1 copy 10 (cut)
    with BuildSketch(Plane(origin=(0, 1.905, -49.9999), x_dir=(-1, 0, 0), z_dir=(0, 1, 0))):
        with Locations((-26.83002, 59.53125)):
            Circle(MIRROR1_COPY_10_SKETCH_R)
    extrude(amount=-MIRROR1_COPY_10_DEPTH, mode=Mode.SUBTRACT)

    # LPattern8: Cut-Extrude2 ×2
    with Locations(*[(0, 0, i * LPATTERN8_PITCH) for i in range(1, LPATTERN8_COUNT)]):
        add(cut_extrude2, mode=Mode.SUBTRACT)

    # LPattern8 copy 1 sketch → LPattern8 copy 1 (cut, through all)
    with BuildSketch(Plane(origin=(-36.83, -9.99998, 29.99994), x_dir=(0, 0, 1), z_dir=(-1, 0, 0))):
        with Locations((59.53125, -19.4183)):
            Circle(LPATTERN8_COPY_1_SKETCH_R)
    extrude(amount=-LPATTERN8_COPY_1_DEPTH, mode=Mode.SUBTRACT)

    # LPattern8 col: Cut-Extrude2 ×2
    with Locations(*[(0, 0, -i * LPATTERN8_COL_PITCH) for i in range(1, LPATTERN8_COL_COUNT)]):
        add(cut_extrude2, mode=Mode.SUBTRACT)

    # LPattern8 col copy 1 sketch → LPattern8 col copy 1 (cut, through all)
    with BuildSketch(Plane(origin=(-36.83, -9.99998, -29.99994), x_dir=(0, 0, 1), z_dir=(-1, 0, 0))):
        with Locations((59.53125, -19.4183)):
            Circle(LPATTERN8_COL_COPY_1_SKETCH_R)
    extrude(amount=-LPATTERN8_COL_COPY_1_DEPTH, mode=Mode.SUBTRACT)


solid = part.part
